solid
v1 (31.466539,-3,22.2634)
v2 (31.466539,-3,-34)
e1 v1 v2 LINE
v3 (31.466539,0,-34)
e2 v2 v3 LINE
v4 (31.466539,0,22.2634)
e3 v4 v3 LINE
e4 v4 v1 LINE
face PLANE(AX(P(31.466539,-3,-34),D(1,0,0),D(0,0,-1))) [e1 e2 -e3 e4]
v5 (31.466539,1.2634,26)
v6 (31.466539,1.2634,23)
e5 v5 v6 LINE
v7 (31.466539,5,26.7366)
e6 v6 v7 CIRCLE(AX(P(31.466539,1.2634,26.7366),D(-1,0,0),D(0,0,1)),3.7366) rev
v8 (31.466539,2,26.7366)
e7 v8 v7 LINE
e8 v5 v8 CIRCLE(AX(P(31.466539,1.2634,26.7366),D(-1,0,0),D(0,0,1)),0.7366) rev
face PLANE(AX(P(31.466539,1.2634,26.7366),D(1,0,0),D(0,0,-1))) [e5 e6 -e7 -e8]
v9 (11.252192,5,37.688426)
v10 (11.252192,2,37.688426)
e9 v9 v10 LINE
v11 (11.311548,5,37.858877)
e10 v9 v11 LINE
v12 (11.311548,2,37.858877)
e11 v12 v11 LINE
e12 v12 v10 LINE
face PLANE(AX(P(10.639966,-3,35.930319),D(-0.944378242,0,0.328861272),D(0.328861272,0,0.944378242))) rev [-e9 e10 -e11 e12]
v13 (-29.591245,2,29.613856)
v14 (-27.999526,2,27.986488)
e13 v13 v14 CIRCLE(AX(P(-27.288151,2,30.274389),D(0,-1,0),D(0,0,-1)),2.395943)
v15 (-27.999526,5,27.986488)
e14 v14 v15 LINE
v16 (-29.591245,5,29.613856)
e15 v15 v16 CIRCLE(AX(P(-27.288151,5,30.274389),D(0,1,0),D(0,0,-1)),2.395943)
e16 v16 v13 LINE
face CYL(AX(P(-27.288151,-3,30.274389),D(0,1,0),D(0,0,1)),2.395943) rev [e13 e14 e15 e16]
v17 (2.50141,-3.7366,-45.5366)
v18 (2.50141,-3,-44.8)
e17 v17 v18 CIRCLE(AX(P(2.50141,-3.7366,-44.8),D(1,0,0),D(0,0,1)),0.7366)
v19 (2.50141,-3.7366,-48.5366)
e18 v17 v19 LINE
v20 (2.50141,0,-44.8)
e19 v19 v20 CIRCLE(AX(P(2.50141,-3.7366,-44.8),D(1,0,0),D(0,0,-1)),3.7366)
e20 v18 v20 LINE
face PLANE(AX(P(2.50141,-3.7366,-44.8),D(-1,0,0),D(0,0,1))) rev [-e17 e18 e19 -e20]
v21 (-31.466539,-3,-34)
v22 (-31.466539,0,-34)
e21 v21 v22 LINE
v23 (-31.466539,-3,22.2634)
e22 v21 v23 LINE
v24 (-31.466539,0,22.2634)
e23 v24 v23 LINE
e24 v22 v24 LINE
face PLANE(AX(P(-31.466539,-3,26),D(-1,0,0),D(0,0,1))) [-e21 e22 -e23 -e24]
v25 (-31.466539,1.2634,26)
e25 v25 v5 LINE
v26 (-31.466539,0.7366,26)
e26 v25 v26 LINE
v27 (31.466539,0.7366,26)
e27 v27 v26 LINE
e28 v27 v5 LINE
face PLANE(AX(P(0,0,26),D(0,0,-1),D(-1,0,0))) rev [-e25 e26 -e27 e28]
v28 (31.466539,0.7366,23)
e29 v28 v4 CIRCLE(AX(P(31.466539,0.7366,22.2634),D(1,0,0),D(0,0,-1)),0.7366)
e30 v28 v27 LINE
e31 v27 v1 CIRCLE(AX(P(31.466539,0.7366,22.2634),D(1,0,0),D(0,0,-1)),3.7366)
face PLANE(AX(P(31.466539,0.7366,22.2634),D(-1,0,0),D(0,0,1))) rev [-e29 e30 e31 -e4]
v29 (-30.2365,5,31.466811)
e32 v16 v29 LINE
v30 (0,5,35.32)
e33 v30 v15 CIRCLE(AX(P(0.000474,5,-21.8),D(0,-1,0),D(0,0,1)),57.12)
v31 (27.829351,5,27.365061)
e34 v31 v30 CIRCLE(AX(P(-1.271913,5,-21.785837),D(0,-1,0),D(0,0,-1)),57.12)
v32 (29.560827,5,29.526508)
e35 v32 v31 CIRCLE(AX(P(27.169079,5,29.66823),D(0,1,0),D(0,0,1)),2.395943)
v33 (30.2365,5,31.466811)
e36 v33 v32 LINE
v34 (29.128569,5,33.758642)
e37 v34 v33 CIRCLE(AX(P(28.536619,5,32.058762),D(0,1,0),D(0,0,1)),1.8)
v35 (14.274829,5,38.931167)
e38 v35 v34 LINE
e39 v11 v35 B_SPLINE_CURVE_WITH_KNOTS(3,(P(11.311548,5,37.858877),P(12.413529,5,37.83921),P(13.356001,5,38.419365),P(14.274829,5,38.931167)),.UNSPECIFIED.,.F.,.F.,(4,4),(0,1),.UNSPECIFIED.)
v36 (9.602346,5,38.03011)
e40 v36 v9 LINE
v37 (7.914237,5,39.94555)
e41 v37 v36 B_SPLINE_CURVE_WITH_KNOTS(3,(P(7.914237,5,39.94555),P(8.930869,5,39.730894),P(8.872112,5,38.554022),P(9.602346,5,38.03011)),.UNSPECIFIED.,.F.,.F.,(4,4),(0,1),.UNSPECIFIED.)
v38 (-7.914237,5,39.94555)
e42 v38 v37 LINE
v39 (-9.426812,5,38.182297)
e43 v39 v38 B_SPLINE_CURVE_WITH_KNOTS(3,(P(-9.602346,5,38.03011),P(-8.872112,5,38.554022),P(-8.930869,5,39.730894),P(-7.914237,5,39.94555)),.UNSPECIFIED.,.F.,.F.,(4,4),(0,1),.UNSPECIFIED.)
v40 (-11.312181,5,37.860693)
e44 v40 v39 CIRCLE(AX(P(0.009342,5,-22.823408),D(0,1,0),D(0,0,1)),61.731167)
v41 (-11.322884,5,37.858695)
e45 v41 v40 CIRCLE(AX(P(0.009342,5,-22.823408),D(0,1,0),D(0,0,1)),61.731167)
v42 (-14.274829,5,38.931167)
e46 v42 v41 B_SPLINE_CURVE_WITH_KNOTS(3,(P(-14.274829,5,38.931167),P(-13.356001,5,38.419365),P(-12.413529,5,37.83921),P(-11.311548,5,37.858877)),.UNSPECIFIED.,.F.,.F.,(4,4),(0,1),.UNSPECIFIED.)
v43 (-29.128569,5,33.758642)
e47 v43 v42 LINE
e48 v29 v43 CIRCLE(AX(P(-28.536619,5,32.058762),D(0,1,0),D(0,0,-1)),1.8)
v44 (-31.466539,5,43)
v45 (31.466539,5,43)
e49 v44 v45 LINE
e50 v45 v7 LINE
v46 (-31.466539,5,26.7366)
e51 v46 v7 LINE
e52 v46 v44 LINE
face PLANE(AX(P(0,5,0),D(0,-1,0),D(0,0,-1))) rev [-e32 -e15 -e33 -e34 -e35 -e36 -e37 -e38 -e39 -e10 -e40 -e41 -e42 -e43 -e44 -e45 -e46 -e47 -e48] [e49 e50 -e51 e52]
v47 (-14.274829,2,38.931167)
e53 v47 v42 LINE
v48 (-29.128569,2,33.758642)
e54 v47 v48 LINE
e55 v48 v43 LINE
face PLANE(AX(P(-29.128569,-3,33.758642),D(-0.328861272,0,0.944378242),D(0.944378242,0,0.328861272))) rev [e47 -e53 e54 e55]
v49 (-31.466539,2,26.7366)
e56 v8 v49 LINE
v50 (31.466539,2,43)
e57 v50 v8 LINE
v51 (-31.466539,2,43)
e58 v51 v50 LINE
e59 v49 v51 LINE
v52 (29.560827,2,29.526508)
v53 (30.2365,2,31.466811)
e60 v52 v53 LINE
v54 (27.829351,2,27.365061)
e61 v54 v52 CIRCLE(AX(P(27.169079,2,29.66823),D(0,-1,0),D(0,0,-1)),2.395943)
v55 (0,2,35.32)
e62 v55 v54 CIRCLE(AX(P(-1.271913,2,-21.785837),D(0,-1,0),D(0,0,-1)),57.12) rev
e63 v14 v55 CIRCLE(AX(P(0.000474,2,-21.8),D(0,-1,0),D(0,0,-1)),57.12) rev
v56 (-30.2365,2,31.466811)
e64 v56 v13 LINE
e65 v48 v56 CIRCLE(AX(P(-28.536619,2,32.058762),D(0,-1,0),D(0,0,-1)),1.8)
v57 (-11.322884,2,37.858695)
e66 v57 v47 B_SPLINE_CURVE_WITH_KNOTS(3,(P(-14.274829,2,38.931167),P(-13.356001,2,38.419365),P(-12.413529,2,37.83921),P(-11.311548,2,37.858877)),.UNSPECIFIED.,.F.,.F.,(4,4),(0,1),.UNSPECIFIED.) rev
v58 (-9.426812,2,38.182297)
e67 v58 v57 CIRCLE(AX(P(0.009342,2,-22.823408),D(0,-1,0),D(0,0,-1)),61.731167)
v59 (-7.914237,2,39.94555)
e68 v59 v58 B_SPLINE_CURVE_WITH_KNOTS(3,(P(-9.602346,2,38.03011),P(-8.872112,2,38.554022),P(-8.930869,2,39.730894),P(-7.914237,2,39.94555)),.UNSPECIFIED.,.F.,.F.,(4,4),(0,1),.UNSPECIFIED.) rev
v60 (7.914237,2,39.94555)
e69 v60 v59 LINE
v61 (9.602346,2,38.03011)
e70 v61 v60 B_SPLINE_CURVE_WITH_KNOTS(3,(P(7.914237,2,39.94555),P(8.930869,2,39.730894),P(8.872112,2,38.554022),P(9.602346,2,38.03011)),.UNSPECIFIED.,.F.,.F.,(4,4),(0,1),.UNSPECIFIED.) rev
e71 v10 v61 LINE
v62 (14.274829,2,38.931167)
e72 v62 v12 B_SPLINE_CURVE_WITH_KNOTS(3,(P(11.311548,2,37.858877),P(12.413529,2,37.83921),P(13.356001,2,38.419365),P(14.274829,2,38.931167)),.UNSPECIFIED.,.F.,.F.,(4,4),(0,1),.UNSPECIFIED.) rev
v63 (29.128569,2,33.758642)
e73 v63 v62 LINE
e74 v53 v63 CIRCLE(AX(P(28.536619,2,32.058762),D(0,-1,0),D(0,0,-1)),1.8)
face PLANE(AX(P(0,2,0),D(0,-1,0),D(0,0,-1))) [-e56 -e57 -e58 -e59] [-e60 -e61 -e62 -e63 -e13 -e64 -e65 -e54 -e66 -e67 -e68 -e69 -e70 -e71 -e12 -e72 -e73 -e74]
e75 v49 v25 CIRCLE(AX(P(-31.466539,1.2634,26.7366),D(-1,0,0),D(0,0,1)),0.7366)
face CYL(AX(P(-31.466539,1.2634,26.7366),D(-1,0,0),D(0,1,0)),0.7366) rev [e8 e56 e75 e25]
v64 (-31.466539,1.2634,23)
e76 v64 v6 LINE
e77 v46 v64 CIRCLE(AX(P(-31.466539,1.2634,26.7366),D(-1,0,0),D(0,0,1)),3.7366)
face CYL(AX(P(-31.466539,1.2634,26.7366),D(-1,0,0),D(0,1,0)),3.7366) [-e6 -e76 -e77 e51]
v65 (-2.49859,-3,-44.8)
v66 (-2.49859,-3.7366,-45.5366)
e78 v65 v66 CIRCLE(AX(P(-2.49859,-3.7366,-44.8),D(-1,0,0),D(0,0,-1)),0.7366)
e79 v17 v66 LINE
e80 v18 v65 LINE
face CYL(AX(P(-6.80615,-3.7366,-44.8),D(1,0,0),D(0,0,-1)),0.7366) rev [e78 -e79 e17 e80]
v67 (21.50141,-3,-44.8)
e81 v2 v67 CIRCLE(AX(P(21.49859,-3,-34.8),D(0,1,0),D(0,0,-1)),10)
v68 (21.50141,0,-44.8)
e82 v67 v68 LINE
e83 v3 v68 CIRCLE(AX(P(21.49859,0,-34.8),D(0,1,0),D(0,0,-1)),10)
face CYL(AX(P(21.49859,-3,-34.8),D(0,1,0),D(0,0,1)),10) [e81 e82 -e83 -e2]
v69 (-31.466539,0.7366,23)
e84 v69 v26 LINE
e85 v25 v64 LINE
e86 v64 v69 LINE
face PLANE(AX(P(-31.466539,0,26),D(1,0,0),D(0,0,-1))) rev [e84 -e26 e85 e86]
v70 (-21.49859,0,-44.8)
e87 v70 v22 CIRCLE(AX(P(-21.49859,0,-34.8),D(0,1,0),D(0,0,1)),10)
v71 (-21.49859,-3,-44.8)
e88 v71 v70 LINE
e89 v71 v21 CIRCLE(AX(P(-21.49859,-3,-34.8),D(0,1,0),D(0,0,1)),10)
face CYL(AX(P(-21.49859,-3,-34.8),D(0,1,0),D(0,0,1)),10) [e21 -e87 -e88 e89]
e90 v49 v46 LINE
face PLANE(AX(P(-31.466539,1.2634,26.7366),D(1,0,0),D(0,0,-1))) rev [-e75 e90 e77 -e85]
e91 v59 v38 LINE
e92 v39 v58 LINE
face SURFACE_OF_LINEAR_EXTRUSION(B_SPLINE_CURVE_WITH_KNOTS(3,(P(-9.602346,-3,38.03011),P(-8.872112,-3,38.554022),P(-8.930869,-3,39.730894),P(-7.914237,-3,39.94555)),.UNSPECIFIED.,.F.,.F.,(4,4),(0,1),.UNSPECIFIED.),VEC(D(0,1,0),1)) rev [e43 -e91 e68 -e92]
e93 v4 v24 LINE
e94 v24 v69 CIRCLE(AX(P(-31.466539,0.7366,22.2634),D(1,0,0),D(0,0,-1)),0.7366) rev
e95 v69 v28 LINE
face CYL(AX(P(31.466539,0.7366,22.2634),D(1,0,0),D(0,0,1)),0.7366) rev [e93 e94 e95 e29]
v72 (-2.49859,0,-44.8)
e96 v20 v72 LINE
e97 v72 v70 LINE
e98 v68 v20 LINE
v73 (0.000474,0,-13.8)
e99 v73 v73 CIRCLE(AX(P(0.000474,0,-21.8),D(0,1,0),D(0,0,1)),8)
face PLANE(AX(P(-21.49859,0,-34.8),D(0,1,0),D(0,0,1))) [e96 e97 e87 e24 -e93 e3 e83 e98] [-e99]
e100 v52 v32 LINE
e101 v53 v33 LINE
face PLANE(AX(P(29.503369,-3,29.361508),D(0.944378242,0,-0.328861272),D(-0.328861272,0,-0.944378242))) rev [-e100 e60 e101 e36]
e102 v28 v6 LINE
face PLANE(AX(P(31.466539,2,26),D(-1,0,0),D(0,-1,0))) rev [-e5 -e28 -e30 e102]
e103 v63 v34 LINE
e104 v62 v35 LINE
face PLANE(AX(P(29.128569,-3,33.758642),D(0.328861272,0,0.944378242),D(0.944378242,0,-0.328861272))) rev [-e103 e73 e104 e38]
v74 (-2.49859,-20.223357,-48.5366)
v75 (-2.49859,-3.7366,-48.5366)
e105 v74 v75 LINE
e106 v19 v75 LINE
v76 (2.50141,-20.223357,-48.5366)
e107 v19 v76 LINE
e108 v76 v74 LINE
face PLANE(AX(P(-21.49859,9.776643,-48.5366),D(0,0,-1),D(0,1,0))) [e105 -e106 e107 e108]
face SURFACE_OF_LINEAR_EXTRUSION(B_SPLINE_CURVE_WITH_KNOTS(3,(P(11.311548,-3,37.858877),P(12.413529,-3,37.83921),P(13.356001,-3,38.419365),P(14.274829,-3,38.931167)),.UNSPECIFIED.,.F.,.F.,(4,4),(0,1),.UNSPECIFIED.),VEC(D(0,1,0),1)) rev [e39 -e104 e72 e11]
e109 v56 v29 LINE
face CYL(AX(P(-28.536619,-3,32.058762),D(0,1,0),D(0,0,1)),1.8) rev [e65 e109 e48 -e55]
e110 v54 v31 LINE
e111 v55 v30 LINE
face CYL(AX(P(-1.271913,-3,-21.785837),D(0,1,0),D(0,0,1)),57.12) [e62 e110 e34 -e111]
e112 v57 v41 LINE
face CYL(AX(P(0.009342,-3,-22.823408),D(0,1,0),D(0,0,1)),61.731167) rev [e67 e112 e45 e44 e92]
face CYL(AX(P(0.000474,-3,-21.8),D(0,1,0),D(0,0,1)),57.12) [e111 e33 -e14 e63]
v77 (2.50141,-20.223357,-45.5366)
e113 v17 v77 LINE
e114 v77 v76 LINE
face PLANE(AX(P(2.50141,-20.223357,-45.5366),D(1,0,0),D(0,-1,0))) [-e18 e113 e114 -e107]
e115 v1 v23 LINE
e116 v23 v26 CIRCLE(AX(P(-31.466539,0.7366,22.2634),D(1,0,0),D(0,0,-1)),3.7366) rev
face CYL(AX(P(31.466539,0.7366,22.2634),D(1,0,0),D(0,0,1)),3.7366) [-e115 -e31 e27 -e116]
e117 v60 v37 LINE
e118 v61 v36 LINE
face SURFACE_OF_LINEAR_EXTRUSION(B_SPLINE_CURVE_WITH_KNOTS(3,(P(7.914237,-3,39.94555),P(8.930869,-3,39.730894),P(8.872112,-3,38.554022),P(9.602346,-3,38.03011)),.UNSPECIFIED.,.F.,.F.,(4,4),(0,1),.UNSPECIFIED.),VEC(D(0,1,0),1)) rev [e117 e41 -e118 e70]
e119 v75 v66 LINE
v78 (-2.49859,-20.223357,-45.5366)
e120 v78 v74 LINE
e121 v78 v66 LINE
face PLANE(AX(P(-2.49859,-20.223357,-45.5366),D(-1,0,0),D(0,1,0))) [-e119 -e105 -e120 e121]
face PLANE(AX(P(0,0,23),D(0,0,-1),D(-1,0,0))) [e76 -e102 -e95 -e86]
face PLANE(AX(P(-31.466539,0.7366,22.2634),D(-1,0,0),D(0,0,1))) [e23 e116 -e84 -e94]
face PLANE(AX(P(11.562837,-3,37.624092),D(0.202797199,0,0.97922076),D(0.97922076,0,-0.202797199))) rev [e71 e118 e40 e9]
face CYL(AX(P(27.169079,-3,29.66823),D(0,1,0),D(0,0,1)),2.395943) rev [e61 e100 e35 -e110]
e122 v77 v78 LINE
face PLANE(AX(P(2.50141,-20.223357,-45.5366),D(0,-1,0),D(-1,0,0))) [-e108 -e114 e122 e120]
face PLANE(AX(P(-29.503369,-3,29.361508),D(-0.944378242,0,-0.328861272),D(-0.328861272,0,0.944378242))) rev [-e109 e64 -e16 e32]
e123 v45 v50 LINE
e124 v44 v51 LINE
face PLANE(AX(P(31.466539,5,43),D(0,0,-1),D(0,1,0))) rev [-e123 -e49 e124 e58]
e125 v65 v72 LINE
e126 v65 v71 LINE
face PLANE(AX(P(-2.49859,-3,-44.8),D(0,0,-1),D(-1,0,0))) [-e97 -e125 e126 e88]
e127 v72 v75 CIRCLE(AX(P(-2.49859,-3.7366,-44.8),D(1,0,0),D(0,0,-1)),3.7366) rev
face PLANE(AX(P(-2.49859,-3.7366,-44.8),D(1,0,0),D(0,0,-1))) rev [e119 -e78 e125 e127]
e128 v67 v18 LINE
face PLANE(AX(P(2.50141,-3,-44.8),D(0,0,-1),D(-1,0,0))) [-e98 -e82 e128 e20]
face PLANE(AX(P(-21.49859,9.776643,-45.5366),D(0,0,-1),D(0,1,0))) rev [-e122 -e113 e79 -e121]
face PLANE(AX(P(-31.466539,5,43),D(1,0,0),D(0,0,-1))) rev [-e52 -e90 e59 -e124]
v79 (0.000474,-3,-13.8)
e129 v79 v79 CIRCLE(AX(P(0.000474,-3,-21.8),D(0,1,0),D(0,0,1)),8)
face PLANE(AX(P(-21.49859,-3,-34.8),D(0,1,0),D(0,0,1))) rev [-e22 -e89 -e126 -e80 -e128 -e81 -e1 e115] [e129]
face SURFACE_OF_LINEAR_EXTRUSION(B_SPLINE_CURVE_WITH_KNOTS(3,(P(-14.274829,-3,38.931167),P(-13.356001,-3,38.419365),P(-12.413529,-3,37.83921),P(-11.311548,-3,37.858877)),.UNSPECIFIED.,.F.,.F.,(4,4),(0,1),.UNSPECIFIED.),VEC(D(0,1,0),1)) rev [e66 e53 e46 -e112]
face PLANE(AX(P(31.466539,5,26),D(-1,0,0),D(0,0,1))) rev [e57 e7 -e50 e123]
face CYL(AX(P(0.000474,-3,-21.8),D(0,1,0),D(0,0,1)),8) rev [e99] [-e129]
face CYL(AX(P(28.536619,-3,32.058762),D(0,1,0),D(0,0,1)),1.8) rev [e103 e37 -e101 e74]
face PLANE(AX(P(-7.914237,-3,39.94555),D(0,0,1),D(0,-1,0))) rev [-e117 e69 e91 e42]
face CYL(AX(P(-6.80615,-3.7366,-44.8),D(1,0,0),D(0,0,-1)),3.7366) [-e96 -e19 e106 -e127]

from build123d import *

# Parameters (mm, degrees)
BASE_FLANGE1_DEPTH           = 3
SKETCH2_R                    = 8
CUT_EXTRUDE1_DEPTH           = 73.112420355
EDGE_FLANGE1_STRIP_W         = 13.4732
EDGE_FLANGE1_STRIP_H         = 3
EDGE_FLANGE1_STRIP_CUT_DEPTH = 62.933077126
EDGE_FLANGE1_DEPTH           = 62.933077126
EDGE_FLANGE2_STRIP_W         = 13.4732
EDGE_FLANGE2_STRIP_H         = 3
EDGE_FLANGE2_STRIP_CUT_DEPTH = 62.933077126
EDGE_FLANGE2_DEPTH           = 62.933077126
CUT_EXTRUDE14_DEPTH          = 73.492766325
CUT_EXTRUDE15_DEPTH          = 73.492766325
CUT_EXTRUDE16_DEPTH          = 73.492766325
SKETCHED_START               = -2.498589927
SKETCHED_BEND2_DEPTH         = 5
SKETCHED_BEND2_2_DEPTH       = 5


# Read off the part's stored shape, not the designer's step: Sketched Bend2
# Sheet-metal steps are written as plain solids
with BuildPart() as part:
    # Sketch1 → Base-Flange1 (new body)
    with BuildSketch(Plane(origin=(0, 0, 0), x_dir=(1, 0, 0), z_dir=(0, 1, 0))):
        with BuildLine():
            Line((2.501410073, 64.8), (-2.498589927, 64.8))
            Line((-2.498589927, 64.8), (-2.498589927, 44.8))
            Line((-2.498589927, 44.8), (-21.498589927, 44.8))
            ThreePointArc((-21.498589927, 44.8), (-28.847059156, 41.582329983), (-31.466538563, 34))
            Line((-31.466538563, 34), (-31.466538563, -26))
            Line((-31.466538563, -26), (31.466538563, -26))
            Line((31.466538563, -26), (31.466538563, 34))
            ThreePointArc((31.466538563, 34), (28.848015597, 41.581293991), (21.501410073, 44.8))
            Line((21.501410073, 44.8), (2.501410073, 44.8))
            Line((2.501410073, 44.8), (2.501410073, 64.8))
        make_face()
    extrude(amount=-BASE_FLANGE1_DEPTH)

    # Sketch2 → Cut-Extrude1 (cut, through all)
    with BuildSketch(Plane(origin=(0, 0, 0), x_dir=(1, 0, 0), z_dir=(0, 1, 0))):
        with Locations(Location((0.000474376, 21.8, 0), (0, 0, 270))):
            Circle(SKETCH2_R)
    extrude(amount=-CUT_EXTRUDE1_DEPTH, mode=Mode.SUBTRACT)

    # Edge-Flange1 strip (across the edge) → Edge-Flange1 strip cut (cut)
    with BuildSketch(Plane(origin=(-31.466538563, 0, 26), x_dir=(0, 0, -1), z_dir=(1, 0, 0))):
        with Locations((-3, -1.5)):
            Rectangle(EDGE_FLANGE1_STRIP_W, EDGE_FLANGE1_STRIP_H)
    extrude(amount=EDGE_FLANGE1_STRIP_CUT_DEPTH, mode=Mode.SUBTRACT)

    # Edge-Flange1 section (across the edge) → Edge-Flange1 (add)
    with BuildSketch(Plane(origin=(-31.466538563, 0, 26), x_dir=(0, 0, -1), z_dir=(1, 0, 0))):
        with BuildLine():
            Line((0, 0.7366), (0, 2))
            Line((0, 2), (3, 2))
            Line((3, 2), (3, 0.7366))
            ThreePointArc((3, 0.7366), (3.215745145, 0.215745145), (3.7366, 0))
            Line((3.7366, 0), (3.7366, -3))
            ThreePointArc((3.7366, -3), (1.094424801, -1.905575199), (0, 0.7366))
        make_face()
    extrude(amount=EDGE_FLANGE1_DEPTH)

    # Edge-Flange2 strip (across the edge) → Edge-Flange2 strip cut (cut)
    with BuildSketch(Plane(origin=(31.466538563, 2, 26), x_dir=(0, -1, 0), z_dir=(-1, 0, 0))):
        with Locations((-6, -1.5)):
            Rectangle(EDGE_FLANGE2_STRIP_W, EDGE_FLANGE2_STRIP_H)
    extrude(amount=EDGE_FLANGE2_STRIP_CUT_DEPTH, mode=Mode.SUBTRACT)

    # Edge-Flange2 section (across the edge) → Edge-Flange2 (add)
    with BuildSketch(Plane(origin=(31.466538563, 2, 26), x_dir=(0, -1, 0), z_dir=(-1, 0, 0))):
        with BuildLine():
            Line((-3, 0.7366), (-3, 17))
            Line((-3, 17), (0, 17))
            Line((0, 17), (0, 0.7366))
            ThreePointArc((0, 0.7366), (0.215745145, 0.215745145), (0.7366, 0))
            Line((0.7366, 0), (0.7366, -3))
            ThreePointArc((0.7366, -3), (-1.905575199, -1.905575199), (-3, 0.7366))
        make_face()
    extrude(amount=EDGE_FLANGE2_DEPTH)

    # Sketch10 → Cut-Extrude14 (cut, through all)
    with BuildSketch(Plane(origin=(0, 5, 0), x_dir=(1, 0, 0), z_dir=(0, 1, 0))):
        with BuildLine():
            ThreePointArc((-27.999525624, -27.986488127), (-14.471973254, -33.456154948), (0, -35.319999998))
            ThreePointArc((0, -35.319999998), (14.426900142, -33.134483917), (27.829351114, -27.3650614))
            ThreePointArc((27.829351114, -27.3650614), (29.363428756, -28.706266155), (29.310299494, -30.743274178))
            ThreePointArc((29.310299494, -30.743274178), (26.455644788, -32.304474337), (23.521539899, -33.71068482))
            ThreePointArc((23.521539899, -33.71068482), (12.036275705, -37.463802008), (0.039934977, -38.907751924))
            ThreePointArc((0.039934977, -38.907751924), (-11.985574487, -37.731187287), (-23.551533984, -34.234651411))
            ThreePointArc((-23.551533984, -34.234651411), (-26.516212861, -32.894099815), (-29.404911166, -31.396828455))
            ThreePointArc((-29.404911166, -31.396828455), (-29.503369191, -29.361507737), (-27.999525624, -27.986488127))
        make_face()
    extrude(amount=-CUT_EXTRUDE14_DEPTH, mode=Mode.SUBTRACT)

    # Sketch12 → Cut-Extrude15 (cut, through all)
    with BuildSketch(Plane(origin=(0, 5, 0), x_dir=(1, 0, 0), z_dir=(0, 1, 0))):
        with BuildLine():
            Line((-7.914237019, -39.945550294), (7.914237019, -39.945550294))
            add(Edge.make_bspline(
                [(7.914237019, -39.945550294), (8.930869278, -39.730893974), (8.872112241, -38.554022125), (9.602345878, -38.030110388)],
                knots=[0, 0, 0, 0, 1, 1, 1, 1], degree=3))
            Line((9.602345878, -38.030110388), (11.562836506, -37.624091619))
            Line((11.562836506, -37.624091619), (0, -37.916784011))
            Line((0, -37.916784011), (-11.562836506, -37.624091619))
            Line((-11.562836506, -37.624091619), (-9.602345878, -38.030110388))
            add(Edge.make_bspline(
                [(-7.914237019, -39.945550294), (-8.930869278, -39.730893974), (-8.872112241, -38.554022125), (-9.602345878, -38.030110388)],
                knots=[0, 0, 0, 0, 1, 1, 1, 1], degree=3))
        make_face()
    extrude(amount=-CUT_EXTRUDE15_DEPTH, mode=Mode.SUBTRACT)

    # Sketch13 → Cut-Extrude16 (cut, through all)
    with BuildSketch(Plane(origin=(0, 5, 0), x_dir=(1, 0, 0), z_dir=(0, 1, 0))):
        with BuildLine():
            Line((-29.503369191, -29.361507737), (-30.236500006, -31.46681125))
            ThreePointArc((-30.236500006, -31.46681125), (-30.1571885, -32.842186741), (-29.128569459, -33.758642374))
            Line((-29.128569459, -33.758642374), (-14.274829355, -38.931167152))
            add(Edge.make_bspline(
                [(-14.274829355, -38.931167152), (-13.356001391, -38.419364556), (-12.413528872, -37.83920993), (-11.311548038, -37.858876708)],
                knots=[0, 0, 0, 0, 1, 1, 1, 1], degree=3))
            Line((-11.311548038, -37.858876708), (-10.639965658, -35.930319464))
            Line((-10.639965658, -35.930319464), (-29.503369191, -29.361507737))
        make_face()
        with BuildLine():
            Line((10.639965658, -35.930319464), (11.311548038, -37.858876708))
            add(Edge.make_bspline(
                [(14.274829355, -38.931167152), (13.356001391, -38.419364556), (12.413528872, -37.83920993), (11.311548038, -37.858876708)],
                knots=[0, 0, 0, 0, 1, 1, 1, 1], degree=3))
            Line((14.274829355, -38.931167152), (29.128569459, -33.758642374))
            ThreePointArc((29.128569459, -33.758642374), (30.1571885, -32.842186741), (30.236500006, -31.46681125))
            Line((30.236500006, -31.46681125), (29.503369191, -29.361507737))
            Line((29.503369191, -29.361507737), (10.639965658, -35.930319464))
        make_face()
    extrude(amount=-CUT_EXTRUDE16_DEPTH, mode=Mode.SUBTRACT)

    # Sketched Bend2 outline → Sketched Bend2 (cut)
    with BuildSketch(Plane.YZ.offset(SKETCHED_START)):
        with BuildLine():
            ThreePointArc((0, -44.8), (-0.845704021, -47.167467001), (-3, -48.463277222))
            Line((-3, -48.463277222), (-3, -64.8))
            Line((-3, -64.8), (0, -64.8))
            Line((0, -64.8), (0, -44.8))
        make_face()
    extrude(amount=SKETCHED_BEND2_DEPTH, mode=Mode.SUBTRACT)

    # Sketched Bend2 2 outline → Sketched Bend2 2 (add)
    with BuildSketch(Plane.YZ.offset(SKETCHED_START)):
        with BuildLine():
            ThreePointArc((-3, -44.8), (-3.215745145, -45.320854855), (-3.7366, -45.5366))
            Line((-3.7366, -45.5366), (-20.223356935, -45.5366))
            Line((-20.223356935, -45.5366), (-20.223356935, -48.5366))
            Line((-20.223356935, -48.5366), (-3.7366, -48.5366))
            ThreePointArc((-3.7366, -48.5366), (-3.36647982, -48.518224121), (-3, -48.463277222))
            Line((-3, -48.463277222), (-3, -44.8))
        make_face()
    extrude(amount=SKETCHED_BEND2_2_DEPTH)


solid = part.part
